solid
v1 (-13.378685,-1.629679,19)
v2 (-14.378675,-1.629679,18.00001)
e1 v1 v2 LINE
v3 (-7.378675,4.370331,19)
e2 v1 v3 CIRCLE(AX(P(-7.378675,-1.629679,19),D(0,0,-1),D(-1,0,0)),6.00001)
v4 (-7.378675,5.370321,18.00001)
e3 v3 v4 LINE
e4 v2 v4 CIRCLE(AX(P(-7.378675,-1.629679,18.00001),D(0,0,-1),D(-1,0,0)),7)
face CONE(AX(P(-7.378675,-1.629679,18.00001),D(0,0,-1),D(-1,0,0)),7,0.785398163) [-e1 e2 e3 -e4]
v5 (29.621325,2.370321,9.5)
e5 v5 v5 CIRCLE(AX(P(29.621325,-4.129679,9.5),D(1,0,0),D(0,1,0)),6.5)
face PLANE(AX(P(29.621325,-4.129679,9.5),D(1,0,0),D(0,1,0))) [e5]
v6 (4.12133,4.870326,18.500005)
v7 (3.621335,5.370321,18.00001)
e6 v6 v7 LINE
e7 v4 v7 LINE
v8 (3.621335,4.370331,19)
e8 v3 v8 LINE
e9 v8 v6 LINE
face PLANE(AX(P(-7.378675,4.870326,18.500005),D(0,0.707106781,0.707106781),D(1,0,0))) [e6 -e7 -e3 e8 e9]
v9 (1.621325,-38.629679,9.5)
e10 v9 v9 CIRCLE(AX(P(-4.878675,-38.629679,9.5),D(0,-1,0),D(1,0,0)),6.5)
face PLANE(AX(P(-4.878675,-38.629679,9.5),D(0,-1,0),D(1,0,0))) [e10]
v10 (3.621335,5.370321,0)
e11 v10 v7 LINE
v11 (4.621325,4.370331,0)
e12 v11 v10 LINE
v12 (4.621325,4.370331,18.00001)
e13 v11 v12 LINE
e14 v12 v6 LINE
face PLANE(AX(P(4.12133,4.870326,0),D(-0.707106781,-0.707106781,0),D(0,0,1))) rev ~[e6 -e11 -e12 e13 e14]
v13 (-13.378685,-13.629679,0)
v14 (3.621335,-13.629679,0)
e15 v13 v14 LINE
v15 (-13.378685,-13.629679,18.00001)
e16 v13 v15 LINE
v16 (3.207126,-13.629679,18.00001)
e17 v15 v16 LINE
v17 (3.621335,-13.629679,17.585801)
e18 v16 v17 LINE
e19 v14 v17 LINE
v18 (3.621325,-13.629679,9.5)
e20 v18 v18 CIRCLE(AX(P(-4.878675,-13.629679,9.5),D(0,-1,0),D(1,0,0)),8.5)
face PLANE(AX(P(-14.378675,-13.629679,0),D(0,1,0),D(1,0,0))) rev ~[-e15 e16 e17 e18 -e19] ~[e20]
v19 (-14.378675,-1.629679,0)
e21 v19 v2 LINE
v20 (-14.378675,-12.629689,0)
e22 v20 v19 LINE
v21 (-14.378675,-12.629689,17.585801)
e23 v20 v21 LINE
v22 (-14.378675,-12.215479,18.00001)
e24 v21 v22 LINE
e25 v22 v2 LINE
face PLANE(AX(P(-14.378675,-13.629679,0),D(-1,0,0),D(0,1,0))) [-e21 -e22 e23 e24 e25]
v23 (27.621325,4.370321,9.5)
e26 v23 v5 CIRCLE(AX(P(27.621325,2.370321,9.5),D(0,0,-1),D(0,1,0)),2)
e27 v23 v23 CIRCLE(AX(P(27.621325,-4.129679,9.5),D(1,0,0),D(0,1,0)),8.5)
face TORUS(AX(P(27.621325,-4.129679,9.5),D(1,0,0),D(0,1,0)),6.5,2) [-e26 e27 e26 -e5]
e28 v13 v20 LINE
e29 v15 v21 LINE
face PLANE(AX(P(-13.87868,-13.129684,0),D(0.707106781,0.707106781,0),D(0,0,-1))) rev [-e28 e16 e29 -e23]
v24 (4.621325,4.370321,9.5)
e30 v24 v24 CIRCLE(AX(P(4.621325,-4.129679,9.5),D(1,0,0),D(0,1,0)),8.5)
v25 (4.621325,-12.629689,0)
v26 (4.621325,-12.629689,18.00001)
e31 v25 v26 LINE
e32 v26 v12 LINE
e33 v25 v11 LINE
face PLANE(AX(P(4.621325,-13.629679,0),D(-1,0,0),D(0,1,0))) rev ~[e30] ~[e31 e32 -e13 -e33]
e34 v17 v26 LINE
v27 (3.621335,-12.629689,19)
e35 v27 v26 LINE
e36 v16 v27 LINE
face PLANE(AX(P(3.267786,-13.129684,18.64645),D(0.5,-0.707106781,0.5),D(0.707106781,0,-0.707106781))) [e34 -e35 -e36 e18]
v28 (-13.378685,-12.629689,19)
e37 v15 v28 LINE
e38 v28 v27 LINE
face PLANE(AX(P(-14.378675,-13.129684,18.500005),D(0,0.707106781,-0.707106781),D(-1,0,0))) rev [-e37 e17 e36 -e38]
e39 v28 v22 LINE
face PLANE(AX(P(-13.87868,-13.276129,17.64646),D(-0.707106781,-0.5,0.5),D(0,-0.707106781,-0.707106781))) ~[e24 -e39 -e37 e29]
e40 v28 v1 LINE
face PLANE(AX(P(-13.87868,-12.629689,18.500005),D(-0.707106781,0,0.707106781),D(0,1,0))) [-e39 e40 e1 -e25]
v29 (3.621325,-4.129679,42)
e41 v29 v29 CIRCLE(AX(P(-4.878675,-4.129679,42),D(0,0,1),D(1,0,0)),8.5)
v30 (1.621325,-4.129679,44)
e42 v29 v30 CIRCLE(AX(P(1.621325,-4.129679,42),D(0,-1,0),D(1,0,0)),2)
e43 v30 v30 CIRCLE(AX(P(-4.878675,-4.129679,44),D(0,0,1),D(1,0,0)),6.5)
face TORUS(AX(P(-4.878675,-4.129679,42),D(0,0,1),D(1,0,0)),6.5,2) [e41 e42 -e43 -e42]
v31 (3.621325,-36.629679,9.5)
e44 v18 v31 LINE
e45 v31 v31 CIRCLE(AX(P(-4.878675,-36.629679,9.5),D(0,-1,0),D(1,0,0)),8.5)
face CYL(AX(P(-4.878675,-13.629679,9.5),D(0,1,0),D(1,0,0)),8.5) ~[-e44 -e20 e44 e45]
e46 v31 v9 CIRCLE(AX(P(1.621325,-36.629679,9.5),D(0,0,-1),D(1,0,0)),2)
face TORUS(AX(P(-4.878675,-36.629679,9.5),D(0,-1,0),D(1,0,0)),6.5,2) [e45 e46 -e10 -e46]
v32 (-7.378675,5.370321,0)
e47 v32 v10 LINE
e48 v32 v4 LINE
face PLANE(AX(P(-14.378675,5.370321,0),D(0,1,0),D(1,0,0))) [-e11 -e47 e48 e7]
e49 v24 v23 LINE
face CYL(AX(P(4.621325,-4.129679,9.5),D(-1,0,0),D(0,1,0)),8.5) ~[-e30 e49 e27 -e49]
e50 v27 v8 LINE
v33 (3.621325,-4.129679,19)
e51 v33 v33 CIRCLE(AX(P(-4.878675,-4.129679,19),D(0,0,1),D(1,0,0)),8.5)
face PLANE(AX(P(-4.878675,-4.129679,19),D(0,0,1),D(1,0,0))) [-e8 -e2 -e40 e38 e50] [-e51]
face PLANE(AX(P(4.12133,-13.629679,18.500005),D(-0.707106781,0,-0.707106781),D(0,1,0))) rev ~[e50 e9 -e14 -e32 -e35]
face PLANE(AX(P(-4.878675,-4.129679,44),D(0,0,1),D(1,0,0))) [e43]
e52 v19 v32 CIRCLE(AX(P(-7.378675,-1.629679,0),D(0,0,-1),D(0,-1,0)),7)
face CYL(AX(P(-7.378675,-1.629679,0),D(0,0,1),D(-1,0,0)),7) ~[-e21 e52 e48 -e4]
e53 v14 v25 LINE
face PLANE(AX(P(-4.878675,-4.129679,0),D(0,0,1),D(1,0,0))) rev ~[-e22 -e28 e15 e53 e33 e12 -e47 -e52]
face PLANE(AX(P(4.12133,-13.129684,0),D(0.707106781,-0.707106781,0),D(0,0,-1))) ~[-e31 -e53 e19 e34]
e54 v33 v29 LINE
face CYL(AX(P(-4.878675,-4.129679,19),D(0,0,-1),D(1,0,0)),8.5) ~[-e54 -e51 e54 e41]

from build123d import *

# Parameters (mm, degrees)
F0_W     = 19
F0_H     = 19
F1_DEPTH = 19
F2_R     = 8.5
F5_DEPTH = 25
F3_R     = 8.5
F6_DEPTH = 25
F4_R     = 8.5
F7_DEPTH = 25
F8_R     = 2
F9_R     = 7
F10_SIZE = 0.99999
F11_SIZE = 0.99999
F12_SIZE = 0.99999


# Not quite as in the source:
# - a fillet or chamfer is up to 0.001 mm smaller than in the source, because OpenCascade refuses the exact size


with BuildPart() as f1:
    # F0 (on Top) → F1 (new body)
    with BuildSketch(Plane.XY):
        with Locations((-4.8786746205, -4.1296786368)):
            Rectangle(F0_W, F0_H)
    extrude(amount=F1_DEPTH)

    # F2 (on face) → F5 (join)
    with BuildSketch(Plane.XZ.offset(13.6296786368)):
        with Locations((-4.8786746205, 9.5)):
            Circle(F2_R)
    extrude(amount=F5_DEPTH)

    # F3 (on face) → F6 (join)
    with BuildSketch(Plane.YZ.offset(4.6213253795)):
        with Locations((-4.1296786368, 9.5)):
            Circle(F3_R)
    extrude(amount=F6_DEPTH)

    # F4 (on face) → F7 (join)
    with BuildSketch(Plane.XY.offset(19)):
        with Locations((-4.8786746205, -4.1296786368)):
            Circle(F4_R)
    extrude(amount=F7_DEPTH)

    # F8
    f8_edges = [f1.edges().sort_by_distance(p)[0] for p in [
        (-13.378675, -38.629679, 9.5),
        (29.621325, -12.629679, 9.5),
        (-13.378675, -4.129679, 44),
    ]]
    fillet(f8_edges, radius=F8_R)

    # F9
    f9_edges = [f1.edges().sort_by_distance(p)[0] for p in [
        (-14.378675, 5.370321, 9.5),
    ]]
    fillet(f9_edges, radius=F9_R)

    # F10 (size 1 in the source; OpenCascade refuses exactly that, so slightly less here)
    f10_edges = [f1.edges().sort_by_distance(p)[0] for p in [
        (4.621325, -4.129679, 19),
    ]]
    chamfer(f10_edges, length=F10_SIZE)

    # F11 (size 1 in the source; OpenCascade refuses exactly that, so slightly less here)
    f11_edges = [f1.edges().sort_by_distance(p)[0] for p in [
        (4.621325, -13.629679, 9.000005),
        (4.12133, -13.629679, 18.500005),
        (-5.37867, -13.629679, 19),
    ]]
    chamfer(f11_edges, length=F11_SIZE)

    # F12 (call 1 of 2: OpenCascade refuses the feature's edges together) (size 1 in the source; OpenCascade refuses exactly that, so slightly less here)
    f12_edges = [f1.edges().sort_by_distance(p)[0] for p in [
        (-1.87867, 5.370321, 19),
        (-12.328422, 3.320069, 19),
        (-14.378675, -7.129684, 19),
        (-14.378675, -13.629679, 9.000005),
        (-14.378675, -13.129684, 18.500005),
    ]]
    chamfer(f12_edges, length=F12_SIZE)

    # F12#2 (call 2 of 2) (size 1 in the source; OpenCascade refuses exactly that, so slightly less here)
    f12_2_edges = [f1.edges().sort_by_distance(p)[0] for p in [
        (4.621325, 5.370321, 9.000005),
    ]]
    chamfer(f12_2_edges, length=F12_SIZE)


solid = f1.part
